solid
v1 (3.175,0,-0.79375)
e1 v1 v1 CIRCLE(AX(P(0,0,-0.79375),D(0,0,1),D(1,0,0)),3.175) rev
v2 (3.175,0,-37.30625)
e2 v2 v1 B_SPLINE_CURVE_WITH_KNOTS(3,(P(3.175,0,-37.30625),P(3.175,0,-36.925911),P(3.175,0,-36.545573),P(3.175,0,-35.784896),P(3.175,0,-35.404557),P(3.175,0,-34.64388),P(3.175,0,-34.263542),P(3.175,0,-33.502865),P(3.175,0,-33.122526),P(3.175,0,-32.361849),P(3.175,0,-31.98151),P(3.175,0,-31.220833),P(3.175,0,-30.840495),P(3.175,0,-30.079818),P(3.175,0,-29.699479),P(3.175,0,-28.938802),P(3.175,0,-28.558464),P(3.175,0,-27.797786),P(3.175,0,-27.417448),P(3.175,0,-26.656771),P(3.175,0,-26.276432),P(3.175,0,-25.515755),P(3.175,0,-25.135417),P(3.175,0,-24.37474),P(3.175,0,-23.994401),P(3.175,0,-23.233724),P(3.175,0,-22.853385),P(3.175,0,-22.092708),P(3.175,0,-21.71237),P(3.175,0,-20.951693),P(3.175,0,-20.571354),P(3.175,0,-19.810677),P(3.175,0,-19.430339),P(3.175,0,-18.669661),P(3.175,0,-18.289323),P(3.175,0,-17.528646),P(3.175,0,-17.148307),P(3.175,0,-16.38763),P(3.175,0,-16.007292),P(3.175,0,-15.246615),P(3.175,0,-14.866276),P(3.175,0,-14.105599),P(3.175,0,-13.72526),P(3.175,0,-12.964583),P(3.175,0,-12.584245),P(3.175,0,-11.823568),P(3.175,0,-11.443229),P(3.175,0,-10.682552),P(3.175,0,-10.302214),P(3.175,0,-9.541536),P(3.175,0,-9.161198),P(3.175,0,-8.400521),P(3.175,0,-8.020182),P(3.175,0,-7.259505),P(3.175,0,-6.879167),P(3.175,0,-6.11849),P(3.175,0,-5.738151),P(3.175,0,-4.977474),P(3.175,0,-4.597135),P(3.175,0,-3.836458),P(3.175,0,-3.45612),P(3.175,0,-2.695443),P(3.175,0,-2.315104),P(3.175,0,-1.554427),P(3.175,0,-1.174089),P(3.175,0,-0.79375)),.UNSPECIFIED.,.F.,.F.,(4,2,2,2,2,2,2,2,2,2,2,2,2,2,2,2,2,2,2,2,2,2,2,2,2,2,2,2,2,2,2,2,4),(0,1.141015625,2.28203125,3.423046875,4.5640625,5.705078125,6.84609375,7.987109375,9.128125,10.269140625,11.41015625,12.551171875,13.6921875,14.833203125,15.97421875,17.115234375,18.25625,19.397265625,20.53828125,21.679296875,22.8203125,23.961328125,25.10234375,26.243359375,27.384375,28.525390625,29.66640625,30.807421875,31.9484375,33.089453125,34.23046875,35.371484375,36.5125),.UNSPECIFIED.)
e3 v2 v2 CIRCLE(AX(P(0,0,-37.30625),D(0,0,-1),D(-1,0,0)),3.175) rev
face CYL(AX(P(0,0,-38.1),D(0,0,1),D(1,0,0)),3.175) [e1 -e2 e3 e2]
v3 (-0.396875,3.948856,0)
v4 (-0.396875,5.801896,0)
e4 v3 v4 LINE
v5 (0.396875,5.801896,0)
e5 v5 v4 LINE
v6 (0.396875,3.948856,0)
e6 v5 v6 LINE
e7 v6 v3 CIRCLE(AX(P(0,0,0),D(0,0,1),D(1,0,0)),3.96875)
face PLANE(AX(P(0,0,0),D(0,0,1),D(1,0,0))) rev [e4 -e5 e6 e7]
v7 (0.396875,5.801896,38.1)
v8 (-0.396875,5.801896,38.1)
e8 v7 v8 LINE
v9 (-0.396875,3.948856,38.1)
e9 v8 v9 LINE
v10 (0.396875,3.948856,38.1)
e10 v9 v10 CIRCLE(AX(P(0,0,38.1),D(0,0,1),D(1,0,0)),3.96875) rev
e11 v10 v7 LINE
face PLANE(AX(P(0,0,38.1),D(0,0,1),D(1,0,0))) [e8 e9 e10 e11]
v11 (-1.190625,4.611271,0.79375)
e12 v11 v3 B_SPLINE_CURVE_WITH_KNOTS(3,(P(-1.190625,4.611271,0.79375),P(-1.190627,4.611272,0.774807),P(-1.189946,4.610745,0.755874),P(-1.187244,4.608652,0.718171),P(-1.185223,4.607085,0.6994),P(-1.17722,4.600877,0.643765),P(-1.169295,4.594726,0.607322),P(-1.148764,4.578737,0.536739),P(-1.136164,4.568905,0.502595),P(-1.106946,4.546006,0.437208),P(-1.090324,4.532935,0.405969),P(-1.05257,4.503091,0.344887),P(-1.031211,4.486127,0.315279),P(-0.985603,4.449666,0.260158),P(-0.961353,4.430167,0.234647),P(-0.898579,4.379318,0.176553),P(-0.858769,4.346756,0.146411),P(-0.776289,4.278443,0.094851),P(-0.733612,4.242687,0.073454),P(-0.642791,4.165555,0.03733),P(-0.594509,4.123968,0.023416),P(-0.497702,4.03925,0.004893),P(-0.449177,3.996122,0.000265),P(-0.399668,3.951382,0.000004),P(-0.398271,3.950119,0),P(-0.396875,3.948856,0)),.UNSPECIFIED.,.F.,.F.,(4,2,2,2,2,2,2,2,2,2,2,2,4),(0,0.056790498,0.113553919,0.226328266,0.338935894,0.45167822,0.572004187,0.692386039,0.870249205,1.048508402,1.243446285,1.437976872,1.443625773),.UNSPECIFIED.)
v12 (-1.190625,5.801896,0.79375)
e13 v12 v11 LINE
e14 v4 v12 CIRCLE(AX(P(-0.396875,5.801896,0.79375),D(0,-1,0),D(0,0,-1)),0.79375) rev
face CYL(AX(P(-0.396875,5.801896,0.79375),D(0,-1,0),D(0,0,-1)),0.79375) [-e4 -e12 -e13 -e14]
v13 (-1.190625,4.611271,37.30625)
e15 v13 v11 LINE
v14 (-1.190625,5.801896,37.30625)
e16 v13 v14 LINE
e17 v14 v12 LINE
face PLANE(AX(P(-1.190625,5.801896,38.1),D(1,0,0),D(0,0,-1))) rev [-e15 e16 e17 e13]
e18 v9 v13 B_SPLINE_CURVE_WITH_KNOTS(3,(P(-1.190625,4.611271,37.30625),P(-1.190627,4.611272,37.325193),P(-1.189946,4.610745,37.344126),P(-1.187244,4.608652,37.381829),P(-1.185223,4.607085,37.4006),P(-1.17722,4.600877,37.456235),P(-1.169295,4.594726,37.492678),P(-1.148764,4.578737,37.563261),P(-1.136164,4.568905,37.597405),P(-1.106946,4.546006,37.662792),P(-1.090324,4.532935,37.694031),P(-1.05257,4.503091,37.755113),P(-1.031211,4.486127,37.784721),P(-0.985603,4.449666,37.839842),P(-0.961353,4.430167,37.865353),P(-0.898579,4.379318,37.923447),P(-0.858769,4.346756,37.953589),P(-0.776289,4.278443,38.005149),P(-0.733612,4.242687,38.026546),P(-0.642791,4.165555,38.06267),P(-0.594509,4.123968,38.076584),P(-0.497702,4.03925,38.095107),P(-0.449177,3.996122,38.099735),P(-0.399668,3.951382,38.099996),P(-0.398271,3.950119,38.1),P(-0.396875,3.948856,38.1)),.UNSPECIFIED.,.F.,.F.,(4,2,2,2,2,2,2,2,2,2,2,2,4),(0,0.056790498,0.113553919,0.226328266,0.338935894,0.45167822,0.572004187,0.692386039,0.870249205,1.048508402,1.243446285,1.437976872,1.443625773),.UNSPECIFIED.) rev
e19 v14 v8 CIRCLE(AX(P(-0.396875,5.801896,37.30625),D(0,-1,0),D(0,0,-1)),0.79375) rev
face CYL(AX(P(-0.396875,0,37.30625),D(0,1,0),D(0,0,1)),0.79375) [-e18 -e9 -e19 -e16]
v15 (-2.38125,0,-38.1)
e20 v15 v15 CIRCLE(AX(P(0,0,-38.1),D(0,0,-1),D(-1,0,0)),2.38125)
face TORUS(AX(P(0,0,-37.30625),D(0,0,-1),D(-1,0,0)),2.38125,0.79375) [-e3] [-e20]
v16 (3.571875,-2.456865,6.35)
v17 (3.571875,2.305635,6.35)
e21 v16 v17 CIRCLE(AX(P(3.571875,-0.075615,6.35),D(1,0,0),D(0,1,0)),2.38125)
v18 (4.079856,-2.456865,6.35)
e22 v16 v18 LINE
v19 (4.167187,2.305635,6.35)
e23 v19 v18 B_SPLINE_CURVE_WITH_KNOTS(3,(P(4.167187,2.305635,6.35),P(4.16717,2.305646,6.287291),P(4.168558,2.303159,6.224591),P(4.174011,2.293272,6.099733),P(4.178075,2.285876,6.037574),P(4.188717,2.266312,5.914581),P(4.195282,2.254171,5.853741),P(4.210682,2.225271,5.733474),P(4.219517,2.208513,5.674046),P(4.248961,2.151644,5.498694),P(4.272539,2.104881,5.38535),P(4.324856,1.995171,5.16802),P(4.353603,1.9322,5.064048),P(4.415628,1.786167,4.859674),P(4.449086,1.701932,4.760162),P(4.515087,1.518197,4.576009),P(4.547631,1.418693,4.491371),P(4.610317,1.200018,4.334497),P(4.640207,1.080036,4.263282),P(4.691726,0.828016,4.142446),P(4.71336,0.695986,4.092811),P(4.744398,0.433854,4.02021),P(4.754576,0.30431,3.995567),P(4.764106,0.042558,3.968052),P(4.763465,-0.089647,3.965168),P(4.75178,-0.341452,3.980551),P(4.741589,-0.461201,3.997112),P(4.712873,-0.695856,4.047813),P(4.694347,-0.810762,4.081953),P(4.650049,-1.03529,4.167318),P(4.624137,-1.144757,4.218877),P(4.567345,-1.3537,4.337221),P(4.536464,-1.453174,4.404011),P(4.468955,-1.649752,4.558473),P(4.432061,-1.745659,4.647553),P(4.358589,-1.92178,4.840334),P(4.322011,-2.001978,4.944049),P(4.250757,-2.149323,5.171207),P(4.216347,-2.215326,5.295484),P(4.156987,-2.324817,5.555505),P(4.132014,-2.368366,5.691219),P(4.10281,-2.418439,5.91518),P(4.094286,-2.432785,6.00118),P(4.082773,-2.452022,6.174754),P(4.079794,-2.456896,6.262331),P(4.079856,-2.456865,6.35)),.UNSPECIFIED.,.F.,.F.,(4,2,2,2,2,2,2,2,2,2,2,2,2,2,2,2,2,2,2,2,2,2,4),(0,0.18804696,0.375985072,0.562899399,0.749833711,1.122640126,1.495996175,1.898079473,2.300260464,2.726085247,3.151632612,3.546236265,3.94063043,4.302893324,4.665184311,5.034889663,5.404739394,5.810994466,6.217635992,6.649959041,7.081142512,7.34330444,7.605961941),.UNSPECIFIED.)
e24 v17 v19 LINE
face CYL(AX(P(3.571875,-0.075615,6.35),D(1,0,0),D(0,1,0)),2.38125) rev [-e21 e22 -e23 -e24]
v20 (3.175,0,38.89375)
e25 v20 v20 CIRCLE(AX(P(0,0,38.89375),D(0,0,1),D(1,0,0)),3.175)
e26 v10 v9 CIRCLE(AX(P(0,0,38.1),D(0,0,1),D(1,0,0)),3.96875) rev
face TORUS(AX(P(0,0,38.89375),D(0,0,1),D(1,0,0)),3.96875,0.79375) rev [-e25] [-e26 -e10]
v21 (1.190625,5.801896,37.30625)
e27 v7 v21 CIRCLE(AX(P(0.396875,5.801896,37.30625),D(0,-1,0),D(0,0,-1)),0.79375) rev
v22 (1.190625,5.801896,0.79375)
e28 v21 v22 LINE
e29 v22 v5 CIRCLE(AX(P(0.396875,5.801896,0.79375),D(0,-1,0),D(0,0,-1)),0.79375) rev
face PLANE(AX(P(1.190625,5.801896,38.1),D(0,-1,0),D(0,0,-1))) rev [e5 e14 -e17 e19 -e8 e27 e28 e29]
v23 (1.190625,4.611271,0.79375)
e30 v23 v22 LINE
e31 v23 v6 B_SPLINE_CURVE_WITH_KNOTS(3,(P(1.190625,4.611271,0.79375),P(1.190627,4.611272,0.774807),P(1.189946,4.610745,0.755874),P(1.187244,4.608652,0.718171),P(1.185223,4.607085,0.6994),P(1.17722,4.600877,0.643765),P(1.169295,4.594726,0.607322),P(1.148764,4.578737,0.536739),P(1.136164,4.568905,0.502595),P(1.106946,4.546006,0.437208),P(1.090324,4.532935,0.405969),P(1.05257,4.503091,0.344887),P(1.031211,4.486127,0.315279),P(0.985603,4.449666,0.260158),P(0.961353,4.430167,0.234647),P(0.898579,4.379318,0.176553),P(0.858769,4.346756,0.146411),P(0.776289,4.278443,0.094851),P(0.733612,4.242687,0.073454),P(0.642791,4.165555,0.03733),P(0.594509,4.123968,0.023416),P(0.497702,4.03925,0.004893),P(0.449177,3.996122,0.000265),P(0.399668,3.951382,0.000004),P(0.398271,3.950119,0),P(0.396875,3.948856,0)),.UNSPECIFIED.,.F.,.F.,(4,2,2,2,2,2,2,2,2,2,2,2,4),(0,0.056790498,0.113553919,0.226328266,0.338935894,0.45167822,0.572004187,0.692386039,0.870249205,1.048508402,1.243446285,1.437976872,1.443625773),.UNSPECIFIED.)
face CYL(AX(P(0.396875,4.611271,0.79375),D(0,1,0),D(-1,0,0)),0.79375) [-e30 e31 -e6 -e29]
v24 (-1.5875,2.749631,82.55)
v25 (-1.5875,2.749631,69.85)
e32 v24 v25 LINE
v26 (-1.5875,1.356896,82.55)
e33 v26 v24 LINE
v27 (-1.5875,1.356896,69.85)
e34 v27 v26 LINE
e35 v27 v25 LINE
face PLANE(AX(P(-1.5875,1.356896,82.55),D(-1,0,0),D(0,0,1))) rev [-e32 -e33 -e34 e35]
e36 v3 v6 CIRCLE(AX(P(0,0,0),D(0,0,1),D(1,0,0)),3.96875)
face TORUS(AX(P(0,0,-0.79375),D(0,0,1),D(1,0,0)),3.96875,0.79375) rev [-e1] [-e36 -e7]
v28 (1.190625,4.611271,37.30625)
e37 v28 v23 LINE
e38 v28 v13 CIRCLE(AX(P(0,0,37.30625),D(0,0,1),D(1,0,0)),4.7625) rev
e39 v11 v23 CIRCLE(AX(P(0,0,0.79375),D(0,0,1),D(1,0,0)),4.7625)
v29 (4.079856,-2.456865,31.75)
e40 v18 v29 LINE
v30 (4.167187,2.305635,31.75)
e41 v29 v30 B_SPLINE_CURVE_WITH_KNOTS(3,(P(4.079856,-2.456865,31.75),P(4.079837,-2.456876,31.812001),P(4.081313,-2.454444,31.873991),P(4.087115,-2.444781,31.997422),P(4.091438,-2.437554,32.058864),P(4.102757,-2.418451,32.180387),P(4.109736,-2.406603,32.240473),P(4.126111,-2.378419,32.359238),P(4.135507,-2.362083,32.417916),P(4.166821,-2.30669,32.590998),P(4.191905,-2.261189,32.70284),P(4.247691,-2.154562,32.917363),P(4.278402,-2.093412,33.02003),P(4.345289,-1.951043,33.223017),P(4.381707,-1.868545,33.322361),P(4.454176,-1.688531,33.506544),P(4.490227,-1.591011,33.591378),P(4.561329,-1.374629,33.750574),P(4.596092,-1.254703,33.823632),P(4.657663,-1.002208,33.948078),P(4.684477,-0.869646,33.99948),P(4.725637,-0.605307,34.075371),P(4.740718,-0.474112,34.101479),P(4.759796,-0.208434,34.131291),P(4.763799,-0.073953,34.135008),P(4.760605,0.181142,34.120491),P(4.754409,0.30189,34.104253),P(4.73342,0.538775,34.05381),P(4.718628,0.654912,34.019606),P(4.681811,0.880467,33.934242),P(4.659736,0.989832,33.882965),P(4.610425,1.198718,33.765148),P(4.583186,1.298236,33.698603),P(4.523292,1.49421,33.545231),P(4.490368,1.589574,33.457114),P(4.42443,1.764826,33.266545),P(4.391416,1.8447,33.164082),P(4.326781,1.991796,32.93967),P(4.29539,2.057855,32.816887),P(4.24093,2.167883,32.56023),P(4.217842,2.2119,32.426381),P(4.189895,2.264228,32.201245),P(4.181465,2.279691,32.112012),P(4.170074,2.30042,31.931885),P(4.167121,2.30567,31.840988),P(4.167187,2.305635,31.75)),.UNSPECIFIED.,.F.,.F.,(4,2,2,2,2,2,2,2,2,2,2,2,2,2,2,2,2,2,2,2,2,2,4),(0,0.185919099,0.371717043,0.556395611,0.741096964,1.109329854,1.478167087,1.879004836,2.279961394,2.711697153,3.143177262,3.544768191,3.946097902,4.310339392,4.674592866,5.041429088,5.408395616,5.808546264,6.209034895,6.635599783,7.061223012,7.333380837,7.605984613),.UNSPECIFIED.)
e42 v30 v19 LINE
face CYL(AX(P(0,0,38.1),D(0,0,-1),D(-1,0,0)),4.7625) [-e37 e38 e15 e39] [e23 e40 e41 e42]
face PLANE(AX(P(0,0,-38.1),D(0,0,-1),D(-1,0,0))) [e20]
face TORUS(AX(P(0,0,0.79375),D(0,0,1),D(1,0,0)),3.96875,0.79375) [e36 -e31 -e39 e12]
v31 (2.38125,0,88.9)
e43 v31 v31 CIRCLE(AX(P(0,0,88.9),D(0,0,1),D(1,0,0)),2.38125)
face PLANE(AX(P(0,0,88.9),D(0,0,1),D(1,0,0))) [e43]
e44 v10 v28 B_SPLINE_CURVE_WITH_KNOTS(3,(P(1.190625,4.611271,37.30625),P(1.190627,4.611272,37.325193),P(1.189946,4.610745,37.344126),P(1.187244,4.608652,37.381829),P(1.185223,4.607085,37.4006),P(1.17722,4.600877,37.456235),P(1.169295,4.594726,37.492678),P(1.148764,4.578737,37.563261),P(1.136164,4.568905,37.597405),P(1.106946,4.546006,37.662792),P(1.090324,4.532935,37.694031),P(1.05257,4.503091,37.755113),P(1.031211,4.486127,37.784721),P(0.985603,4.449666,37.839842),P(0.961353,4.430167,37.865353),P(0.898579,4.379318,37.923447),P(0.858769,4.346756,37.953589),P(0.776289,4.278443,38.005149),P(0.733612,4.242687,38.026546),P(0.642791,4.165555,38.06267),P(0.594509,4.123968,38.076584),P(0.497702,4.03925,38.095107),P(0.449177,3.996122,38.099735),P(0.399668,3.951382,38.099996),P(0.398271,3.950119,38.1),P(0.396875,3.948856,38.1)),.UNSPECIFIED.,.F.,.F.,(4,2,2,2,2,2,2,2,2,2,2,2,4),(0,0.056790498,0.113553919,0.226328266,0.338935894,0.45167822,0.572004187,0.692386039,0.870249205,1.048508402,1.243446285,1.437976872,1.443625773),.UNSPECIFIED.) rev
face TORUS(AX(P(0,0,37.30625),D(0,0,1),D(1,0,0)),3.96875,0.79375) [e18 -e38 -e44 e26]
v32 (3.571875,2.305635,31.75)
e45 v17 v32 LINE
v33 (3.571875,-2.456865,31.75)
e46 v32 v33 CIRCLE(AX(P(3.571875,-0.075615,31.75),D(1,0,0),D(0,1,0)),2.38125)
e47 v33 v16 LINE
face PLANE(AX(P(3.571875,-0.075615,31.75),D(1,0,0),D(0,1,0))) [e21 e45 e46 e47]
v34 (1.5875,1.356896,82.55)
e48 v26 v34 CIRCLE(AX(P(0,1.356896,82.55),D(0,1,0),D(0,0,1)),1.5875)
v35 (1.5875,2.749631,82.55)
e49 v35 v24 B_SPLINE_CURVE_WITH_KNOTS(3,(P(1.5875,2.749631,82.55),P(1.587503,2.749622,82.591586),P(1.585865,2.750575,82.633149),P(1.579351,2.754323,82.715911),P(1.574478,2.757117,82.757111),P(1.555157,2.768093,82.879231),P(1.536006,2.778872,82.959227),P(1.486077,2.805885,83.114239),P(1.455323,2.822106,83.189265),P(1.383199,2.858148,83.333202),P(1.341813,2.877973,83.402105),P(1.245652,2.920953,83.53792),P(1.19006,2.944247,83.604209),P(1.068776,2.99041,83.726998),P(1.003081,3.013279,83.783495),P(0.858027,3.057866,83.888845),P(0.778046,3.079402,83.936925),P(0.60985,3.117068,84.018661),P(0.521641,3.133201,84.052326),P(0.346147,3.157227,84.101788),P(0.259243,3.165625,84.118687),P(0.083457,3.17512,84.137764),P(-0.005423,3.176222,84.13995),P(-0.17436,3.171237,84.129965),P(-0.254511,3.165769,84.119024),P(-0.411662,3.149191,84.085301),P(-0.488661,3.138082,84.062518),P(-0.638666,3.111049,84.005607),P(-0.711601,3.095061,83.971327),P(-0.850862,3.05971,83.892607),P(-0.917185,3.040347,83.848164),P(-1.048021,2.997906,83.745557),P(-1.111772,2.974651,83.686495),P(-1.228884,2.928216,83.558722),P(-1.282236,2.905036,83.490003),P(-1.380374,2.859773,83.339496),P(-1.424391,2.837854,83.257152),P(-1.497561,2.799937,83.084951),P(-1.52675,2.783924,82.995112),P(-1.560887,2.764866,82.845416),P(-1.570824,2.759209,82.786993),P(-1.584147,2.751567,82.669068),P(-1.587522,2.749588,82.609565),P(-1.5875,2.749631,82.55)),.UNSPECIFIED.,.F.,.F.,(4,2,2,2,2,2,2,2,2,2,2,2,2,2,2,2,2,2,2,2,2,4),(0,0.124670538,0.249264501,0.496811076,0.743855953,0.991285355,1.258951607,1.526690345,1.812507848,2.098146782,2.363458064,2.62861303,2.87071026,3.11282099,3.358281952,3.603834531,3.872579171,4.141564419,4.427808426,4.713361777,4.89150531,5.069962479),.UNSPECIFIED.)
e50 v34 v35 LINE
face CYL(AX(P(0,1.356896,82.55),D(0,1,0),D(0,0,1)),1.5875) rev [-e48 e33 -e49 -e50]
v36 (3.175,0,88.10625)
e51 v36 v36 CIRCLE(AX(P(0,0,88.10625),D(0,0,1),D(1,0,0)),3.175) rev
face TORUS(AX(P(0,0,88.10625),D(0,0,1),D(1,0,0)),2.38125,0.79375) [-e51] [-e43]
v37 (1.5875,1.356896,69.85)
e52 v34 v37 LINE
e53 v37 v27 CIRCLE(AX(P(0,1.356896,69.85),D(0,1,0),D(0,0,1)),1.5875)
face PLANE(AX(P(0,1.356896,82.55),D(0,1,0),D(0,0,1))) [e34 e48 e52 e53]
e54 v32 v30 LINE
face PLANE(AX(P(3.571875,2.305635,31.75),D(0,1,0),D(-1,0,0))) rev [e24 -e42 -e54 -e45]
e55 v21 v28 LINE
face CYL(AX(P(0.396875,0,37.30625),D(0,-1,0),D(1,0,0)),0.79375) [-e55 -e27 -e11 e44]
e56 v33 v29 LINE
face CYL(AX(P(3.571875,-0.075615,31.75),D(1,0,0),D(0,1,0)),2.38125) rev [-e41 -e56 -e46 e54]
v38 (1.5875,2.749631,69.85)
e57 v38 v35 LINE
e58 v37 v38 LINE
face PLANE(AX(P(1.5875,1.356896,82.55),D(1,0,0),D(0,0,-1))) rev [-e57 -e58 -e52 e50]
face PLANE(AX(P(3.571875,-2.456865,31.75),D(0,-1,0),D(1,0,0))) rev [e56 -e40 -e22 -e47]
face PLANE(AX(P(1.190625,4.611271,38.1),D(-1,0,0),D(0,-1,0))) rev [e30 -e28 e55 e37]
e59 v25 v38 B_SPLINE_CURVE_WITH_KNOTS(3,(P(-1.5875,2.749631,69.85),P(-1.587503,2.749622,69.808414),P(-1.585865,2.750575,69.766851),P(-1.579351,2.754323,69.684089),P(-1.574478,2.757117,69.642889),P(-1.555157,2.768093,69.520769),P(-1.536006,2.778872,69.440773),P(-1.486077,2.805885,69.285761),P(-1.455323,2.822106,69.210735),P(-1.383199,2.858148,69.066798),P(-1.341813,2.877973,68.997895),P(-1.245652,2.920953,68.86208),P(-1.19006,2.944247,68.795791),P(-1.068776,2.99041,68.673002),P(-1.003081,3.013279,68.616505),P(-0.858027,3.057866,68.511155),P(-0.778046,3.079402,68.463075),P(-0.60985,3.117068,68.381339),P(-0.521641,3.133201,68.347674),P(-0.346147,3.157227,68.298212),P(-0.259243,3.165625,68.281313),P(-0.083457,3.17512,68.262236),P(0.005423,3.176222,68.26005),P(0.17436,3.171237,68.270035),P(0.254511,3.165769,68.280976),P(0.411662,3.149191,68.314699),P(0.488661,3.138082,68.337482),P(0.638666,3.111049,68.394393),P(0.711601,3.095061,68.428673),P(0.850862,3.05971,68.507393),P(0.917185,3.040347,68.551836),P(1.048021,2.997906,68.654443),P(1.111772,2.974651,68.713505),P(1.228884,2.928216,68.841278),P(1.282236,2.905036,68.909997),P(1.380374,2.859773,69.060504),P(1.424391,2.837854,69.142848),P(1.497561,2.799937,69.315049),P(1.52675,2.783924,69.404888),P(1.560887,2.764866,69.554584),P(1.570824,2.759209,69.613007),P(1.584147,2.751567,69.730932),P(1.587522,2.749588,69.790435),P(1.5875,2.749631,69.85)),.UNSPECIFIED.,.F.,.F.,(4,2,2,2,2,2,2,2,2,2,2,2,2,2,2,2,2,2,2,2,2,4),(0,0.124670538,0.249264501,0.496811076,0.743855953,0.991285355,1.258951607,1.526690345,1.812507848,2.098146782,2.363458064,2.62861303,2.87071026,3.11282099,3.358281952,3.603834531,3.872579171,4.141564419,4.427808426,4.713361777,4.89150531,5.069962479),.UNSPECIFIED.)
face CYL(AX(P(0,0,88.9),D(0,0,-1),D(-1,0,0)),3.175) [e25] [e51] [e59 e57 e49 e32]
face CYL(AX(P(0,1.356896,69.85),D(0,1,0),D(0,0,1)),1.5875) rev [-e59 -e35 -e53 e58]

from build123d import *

# Parameters (mm, degrees)
BOSS_EXTRUDE1_DEPTH = 38.1
SKETCH2_R           = 3.175
BOSS_EXTRUDE2_DEPTH = 38.1
BOSS_EXTRUDE3_START = 50.8
SKETCH3_R           = 3.175
BOSS_EXTRUDE3_DEPTH = 50.8
FILLET1_R           = 0.79375
CUT_EXTRUDE1_DEPTH  = 1.190625
CUT_EXTRUDE2_DEPTH  = 4.445


with BuildPart() as part:
    # Sketch1 → Boss-Extrude1 (new body)
    with BuildSketch(Plane.XY):
        with BuildLine():
            Line((1.190625, 4.611270797), (1.190625, 5.801895797))
            Line((1.190625, 5.801895797), (-1.190625, 5.801895797))
            Line((-1.190625, 5.801895797), (-1.190625, 4.611270797))
            ThreePointArc((-1.190625, 4.611270797), (0, -4.7625), (1.190625, 4.611270797))
        make_face()
    extrude(amount=BOSS_EXTRUDE1_DEPTH)

    # Sketch2 → Boss-Extrude2 (add)
    with BuildSketch(Plane(origin=(0, 0, 0), x_dir=(-1, 0, 0), z_dir=(0, 0, -1))):
        with Locations(Location((0, 0, 0), (0, 0, 180))):
            Circle(SKETCH2_R)
    extrude(amount=BOSS_EXTRUDE2_DEPTH)

    # Sketch3 → Boss-Extrude3 (add)
    with BuildSketch(Plane.XY.offset(38.1).offset(BOSS_EXTRUDE3_START)):
        Circle(SKETCH3_R)
    extrude(amount=-BOSS_EXTRUDE3_DEPTH)

    # Fillet1
    fillet1_edges = [part.edges().sort_by_distance(p)[0] for p in [
        (-3.175, 0, 0),
        (-3.175, 0, -38.1),
        (-1.190625, 5.206583297, 38.1),
        (-3.175, 0, 38.1),
        (-3.175, 0, 88.9),
        (0, -4.7625, 38.1),
        (-1.190625, 5.206583297, 0),
        (1.190625, 5.206583297, 0),
        (0, -4.7625, 0),
        (1.190625, 5.206583297, 38.1),
    ]]
    fillet(fillet1_edges, radius=FILLET1_R - 0.0001)  # a hair under: the kernel refuses the full size

    # Sketch4 → Cut-Extrude1 (cut)
    with BuildSketch(Plane(origin=(4.7625, 0, 0), x_dir=(0, 0, -1), z_dir=(1, 0, 0))):
        with BuildLine():
            Line((-31.75, 2.305635398), (-6.35, 2.305635398))
            ThreePointArc((-6.35, 2.305635398), (-3.96875, -0.075614602), (-6.35, -2.456864602))
            Line((-6.35, -2.456864602), (-31.75, -2.456864602))
            ThreePointArc((-31.75, -2.456864602), (-34.13125, -0.075614602), (-31.75, 2.305635398))
        make_face()
    extrude(amount=-CUT_EXTRUDE1_DEPTH, mode=Mode.SUBTRACT)

    # Sketch5 → Cut-Extrude2 (cut)
    with BuildSketch(Plane(origin=(0, 5.801895797, 0), x_dir=(1, 0, 0), z_dir=(0, 1, 0))):
        with BuildLine():
            Line((-1.5875, -82.55), (-1.5875, -69.85))
            ThreePointArc((-1.5875, -69.85), (0, -68.2625), (1.5875, -69.85))
            Line((1.5875, -69.85), (1.5875, -82.55))
            ThreePointArc((1.5875, -82.55), (0, -84.1375), (-1.5875, -82.55))
        make_face()
    extrude(amount=-CUT_EXTRUDE2_DEPTH, mode=Mode.SUBTRACT)


solid = part.part
